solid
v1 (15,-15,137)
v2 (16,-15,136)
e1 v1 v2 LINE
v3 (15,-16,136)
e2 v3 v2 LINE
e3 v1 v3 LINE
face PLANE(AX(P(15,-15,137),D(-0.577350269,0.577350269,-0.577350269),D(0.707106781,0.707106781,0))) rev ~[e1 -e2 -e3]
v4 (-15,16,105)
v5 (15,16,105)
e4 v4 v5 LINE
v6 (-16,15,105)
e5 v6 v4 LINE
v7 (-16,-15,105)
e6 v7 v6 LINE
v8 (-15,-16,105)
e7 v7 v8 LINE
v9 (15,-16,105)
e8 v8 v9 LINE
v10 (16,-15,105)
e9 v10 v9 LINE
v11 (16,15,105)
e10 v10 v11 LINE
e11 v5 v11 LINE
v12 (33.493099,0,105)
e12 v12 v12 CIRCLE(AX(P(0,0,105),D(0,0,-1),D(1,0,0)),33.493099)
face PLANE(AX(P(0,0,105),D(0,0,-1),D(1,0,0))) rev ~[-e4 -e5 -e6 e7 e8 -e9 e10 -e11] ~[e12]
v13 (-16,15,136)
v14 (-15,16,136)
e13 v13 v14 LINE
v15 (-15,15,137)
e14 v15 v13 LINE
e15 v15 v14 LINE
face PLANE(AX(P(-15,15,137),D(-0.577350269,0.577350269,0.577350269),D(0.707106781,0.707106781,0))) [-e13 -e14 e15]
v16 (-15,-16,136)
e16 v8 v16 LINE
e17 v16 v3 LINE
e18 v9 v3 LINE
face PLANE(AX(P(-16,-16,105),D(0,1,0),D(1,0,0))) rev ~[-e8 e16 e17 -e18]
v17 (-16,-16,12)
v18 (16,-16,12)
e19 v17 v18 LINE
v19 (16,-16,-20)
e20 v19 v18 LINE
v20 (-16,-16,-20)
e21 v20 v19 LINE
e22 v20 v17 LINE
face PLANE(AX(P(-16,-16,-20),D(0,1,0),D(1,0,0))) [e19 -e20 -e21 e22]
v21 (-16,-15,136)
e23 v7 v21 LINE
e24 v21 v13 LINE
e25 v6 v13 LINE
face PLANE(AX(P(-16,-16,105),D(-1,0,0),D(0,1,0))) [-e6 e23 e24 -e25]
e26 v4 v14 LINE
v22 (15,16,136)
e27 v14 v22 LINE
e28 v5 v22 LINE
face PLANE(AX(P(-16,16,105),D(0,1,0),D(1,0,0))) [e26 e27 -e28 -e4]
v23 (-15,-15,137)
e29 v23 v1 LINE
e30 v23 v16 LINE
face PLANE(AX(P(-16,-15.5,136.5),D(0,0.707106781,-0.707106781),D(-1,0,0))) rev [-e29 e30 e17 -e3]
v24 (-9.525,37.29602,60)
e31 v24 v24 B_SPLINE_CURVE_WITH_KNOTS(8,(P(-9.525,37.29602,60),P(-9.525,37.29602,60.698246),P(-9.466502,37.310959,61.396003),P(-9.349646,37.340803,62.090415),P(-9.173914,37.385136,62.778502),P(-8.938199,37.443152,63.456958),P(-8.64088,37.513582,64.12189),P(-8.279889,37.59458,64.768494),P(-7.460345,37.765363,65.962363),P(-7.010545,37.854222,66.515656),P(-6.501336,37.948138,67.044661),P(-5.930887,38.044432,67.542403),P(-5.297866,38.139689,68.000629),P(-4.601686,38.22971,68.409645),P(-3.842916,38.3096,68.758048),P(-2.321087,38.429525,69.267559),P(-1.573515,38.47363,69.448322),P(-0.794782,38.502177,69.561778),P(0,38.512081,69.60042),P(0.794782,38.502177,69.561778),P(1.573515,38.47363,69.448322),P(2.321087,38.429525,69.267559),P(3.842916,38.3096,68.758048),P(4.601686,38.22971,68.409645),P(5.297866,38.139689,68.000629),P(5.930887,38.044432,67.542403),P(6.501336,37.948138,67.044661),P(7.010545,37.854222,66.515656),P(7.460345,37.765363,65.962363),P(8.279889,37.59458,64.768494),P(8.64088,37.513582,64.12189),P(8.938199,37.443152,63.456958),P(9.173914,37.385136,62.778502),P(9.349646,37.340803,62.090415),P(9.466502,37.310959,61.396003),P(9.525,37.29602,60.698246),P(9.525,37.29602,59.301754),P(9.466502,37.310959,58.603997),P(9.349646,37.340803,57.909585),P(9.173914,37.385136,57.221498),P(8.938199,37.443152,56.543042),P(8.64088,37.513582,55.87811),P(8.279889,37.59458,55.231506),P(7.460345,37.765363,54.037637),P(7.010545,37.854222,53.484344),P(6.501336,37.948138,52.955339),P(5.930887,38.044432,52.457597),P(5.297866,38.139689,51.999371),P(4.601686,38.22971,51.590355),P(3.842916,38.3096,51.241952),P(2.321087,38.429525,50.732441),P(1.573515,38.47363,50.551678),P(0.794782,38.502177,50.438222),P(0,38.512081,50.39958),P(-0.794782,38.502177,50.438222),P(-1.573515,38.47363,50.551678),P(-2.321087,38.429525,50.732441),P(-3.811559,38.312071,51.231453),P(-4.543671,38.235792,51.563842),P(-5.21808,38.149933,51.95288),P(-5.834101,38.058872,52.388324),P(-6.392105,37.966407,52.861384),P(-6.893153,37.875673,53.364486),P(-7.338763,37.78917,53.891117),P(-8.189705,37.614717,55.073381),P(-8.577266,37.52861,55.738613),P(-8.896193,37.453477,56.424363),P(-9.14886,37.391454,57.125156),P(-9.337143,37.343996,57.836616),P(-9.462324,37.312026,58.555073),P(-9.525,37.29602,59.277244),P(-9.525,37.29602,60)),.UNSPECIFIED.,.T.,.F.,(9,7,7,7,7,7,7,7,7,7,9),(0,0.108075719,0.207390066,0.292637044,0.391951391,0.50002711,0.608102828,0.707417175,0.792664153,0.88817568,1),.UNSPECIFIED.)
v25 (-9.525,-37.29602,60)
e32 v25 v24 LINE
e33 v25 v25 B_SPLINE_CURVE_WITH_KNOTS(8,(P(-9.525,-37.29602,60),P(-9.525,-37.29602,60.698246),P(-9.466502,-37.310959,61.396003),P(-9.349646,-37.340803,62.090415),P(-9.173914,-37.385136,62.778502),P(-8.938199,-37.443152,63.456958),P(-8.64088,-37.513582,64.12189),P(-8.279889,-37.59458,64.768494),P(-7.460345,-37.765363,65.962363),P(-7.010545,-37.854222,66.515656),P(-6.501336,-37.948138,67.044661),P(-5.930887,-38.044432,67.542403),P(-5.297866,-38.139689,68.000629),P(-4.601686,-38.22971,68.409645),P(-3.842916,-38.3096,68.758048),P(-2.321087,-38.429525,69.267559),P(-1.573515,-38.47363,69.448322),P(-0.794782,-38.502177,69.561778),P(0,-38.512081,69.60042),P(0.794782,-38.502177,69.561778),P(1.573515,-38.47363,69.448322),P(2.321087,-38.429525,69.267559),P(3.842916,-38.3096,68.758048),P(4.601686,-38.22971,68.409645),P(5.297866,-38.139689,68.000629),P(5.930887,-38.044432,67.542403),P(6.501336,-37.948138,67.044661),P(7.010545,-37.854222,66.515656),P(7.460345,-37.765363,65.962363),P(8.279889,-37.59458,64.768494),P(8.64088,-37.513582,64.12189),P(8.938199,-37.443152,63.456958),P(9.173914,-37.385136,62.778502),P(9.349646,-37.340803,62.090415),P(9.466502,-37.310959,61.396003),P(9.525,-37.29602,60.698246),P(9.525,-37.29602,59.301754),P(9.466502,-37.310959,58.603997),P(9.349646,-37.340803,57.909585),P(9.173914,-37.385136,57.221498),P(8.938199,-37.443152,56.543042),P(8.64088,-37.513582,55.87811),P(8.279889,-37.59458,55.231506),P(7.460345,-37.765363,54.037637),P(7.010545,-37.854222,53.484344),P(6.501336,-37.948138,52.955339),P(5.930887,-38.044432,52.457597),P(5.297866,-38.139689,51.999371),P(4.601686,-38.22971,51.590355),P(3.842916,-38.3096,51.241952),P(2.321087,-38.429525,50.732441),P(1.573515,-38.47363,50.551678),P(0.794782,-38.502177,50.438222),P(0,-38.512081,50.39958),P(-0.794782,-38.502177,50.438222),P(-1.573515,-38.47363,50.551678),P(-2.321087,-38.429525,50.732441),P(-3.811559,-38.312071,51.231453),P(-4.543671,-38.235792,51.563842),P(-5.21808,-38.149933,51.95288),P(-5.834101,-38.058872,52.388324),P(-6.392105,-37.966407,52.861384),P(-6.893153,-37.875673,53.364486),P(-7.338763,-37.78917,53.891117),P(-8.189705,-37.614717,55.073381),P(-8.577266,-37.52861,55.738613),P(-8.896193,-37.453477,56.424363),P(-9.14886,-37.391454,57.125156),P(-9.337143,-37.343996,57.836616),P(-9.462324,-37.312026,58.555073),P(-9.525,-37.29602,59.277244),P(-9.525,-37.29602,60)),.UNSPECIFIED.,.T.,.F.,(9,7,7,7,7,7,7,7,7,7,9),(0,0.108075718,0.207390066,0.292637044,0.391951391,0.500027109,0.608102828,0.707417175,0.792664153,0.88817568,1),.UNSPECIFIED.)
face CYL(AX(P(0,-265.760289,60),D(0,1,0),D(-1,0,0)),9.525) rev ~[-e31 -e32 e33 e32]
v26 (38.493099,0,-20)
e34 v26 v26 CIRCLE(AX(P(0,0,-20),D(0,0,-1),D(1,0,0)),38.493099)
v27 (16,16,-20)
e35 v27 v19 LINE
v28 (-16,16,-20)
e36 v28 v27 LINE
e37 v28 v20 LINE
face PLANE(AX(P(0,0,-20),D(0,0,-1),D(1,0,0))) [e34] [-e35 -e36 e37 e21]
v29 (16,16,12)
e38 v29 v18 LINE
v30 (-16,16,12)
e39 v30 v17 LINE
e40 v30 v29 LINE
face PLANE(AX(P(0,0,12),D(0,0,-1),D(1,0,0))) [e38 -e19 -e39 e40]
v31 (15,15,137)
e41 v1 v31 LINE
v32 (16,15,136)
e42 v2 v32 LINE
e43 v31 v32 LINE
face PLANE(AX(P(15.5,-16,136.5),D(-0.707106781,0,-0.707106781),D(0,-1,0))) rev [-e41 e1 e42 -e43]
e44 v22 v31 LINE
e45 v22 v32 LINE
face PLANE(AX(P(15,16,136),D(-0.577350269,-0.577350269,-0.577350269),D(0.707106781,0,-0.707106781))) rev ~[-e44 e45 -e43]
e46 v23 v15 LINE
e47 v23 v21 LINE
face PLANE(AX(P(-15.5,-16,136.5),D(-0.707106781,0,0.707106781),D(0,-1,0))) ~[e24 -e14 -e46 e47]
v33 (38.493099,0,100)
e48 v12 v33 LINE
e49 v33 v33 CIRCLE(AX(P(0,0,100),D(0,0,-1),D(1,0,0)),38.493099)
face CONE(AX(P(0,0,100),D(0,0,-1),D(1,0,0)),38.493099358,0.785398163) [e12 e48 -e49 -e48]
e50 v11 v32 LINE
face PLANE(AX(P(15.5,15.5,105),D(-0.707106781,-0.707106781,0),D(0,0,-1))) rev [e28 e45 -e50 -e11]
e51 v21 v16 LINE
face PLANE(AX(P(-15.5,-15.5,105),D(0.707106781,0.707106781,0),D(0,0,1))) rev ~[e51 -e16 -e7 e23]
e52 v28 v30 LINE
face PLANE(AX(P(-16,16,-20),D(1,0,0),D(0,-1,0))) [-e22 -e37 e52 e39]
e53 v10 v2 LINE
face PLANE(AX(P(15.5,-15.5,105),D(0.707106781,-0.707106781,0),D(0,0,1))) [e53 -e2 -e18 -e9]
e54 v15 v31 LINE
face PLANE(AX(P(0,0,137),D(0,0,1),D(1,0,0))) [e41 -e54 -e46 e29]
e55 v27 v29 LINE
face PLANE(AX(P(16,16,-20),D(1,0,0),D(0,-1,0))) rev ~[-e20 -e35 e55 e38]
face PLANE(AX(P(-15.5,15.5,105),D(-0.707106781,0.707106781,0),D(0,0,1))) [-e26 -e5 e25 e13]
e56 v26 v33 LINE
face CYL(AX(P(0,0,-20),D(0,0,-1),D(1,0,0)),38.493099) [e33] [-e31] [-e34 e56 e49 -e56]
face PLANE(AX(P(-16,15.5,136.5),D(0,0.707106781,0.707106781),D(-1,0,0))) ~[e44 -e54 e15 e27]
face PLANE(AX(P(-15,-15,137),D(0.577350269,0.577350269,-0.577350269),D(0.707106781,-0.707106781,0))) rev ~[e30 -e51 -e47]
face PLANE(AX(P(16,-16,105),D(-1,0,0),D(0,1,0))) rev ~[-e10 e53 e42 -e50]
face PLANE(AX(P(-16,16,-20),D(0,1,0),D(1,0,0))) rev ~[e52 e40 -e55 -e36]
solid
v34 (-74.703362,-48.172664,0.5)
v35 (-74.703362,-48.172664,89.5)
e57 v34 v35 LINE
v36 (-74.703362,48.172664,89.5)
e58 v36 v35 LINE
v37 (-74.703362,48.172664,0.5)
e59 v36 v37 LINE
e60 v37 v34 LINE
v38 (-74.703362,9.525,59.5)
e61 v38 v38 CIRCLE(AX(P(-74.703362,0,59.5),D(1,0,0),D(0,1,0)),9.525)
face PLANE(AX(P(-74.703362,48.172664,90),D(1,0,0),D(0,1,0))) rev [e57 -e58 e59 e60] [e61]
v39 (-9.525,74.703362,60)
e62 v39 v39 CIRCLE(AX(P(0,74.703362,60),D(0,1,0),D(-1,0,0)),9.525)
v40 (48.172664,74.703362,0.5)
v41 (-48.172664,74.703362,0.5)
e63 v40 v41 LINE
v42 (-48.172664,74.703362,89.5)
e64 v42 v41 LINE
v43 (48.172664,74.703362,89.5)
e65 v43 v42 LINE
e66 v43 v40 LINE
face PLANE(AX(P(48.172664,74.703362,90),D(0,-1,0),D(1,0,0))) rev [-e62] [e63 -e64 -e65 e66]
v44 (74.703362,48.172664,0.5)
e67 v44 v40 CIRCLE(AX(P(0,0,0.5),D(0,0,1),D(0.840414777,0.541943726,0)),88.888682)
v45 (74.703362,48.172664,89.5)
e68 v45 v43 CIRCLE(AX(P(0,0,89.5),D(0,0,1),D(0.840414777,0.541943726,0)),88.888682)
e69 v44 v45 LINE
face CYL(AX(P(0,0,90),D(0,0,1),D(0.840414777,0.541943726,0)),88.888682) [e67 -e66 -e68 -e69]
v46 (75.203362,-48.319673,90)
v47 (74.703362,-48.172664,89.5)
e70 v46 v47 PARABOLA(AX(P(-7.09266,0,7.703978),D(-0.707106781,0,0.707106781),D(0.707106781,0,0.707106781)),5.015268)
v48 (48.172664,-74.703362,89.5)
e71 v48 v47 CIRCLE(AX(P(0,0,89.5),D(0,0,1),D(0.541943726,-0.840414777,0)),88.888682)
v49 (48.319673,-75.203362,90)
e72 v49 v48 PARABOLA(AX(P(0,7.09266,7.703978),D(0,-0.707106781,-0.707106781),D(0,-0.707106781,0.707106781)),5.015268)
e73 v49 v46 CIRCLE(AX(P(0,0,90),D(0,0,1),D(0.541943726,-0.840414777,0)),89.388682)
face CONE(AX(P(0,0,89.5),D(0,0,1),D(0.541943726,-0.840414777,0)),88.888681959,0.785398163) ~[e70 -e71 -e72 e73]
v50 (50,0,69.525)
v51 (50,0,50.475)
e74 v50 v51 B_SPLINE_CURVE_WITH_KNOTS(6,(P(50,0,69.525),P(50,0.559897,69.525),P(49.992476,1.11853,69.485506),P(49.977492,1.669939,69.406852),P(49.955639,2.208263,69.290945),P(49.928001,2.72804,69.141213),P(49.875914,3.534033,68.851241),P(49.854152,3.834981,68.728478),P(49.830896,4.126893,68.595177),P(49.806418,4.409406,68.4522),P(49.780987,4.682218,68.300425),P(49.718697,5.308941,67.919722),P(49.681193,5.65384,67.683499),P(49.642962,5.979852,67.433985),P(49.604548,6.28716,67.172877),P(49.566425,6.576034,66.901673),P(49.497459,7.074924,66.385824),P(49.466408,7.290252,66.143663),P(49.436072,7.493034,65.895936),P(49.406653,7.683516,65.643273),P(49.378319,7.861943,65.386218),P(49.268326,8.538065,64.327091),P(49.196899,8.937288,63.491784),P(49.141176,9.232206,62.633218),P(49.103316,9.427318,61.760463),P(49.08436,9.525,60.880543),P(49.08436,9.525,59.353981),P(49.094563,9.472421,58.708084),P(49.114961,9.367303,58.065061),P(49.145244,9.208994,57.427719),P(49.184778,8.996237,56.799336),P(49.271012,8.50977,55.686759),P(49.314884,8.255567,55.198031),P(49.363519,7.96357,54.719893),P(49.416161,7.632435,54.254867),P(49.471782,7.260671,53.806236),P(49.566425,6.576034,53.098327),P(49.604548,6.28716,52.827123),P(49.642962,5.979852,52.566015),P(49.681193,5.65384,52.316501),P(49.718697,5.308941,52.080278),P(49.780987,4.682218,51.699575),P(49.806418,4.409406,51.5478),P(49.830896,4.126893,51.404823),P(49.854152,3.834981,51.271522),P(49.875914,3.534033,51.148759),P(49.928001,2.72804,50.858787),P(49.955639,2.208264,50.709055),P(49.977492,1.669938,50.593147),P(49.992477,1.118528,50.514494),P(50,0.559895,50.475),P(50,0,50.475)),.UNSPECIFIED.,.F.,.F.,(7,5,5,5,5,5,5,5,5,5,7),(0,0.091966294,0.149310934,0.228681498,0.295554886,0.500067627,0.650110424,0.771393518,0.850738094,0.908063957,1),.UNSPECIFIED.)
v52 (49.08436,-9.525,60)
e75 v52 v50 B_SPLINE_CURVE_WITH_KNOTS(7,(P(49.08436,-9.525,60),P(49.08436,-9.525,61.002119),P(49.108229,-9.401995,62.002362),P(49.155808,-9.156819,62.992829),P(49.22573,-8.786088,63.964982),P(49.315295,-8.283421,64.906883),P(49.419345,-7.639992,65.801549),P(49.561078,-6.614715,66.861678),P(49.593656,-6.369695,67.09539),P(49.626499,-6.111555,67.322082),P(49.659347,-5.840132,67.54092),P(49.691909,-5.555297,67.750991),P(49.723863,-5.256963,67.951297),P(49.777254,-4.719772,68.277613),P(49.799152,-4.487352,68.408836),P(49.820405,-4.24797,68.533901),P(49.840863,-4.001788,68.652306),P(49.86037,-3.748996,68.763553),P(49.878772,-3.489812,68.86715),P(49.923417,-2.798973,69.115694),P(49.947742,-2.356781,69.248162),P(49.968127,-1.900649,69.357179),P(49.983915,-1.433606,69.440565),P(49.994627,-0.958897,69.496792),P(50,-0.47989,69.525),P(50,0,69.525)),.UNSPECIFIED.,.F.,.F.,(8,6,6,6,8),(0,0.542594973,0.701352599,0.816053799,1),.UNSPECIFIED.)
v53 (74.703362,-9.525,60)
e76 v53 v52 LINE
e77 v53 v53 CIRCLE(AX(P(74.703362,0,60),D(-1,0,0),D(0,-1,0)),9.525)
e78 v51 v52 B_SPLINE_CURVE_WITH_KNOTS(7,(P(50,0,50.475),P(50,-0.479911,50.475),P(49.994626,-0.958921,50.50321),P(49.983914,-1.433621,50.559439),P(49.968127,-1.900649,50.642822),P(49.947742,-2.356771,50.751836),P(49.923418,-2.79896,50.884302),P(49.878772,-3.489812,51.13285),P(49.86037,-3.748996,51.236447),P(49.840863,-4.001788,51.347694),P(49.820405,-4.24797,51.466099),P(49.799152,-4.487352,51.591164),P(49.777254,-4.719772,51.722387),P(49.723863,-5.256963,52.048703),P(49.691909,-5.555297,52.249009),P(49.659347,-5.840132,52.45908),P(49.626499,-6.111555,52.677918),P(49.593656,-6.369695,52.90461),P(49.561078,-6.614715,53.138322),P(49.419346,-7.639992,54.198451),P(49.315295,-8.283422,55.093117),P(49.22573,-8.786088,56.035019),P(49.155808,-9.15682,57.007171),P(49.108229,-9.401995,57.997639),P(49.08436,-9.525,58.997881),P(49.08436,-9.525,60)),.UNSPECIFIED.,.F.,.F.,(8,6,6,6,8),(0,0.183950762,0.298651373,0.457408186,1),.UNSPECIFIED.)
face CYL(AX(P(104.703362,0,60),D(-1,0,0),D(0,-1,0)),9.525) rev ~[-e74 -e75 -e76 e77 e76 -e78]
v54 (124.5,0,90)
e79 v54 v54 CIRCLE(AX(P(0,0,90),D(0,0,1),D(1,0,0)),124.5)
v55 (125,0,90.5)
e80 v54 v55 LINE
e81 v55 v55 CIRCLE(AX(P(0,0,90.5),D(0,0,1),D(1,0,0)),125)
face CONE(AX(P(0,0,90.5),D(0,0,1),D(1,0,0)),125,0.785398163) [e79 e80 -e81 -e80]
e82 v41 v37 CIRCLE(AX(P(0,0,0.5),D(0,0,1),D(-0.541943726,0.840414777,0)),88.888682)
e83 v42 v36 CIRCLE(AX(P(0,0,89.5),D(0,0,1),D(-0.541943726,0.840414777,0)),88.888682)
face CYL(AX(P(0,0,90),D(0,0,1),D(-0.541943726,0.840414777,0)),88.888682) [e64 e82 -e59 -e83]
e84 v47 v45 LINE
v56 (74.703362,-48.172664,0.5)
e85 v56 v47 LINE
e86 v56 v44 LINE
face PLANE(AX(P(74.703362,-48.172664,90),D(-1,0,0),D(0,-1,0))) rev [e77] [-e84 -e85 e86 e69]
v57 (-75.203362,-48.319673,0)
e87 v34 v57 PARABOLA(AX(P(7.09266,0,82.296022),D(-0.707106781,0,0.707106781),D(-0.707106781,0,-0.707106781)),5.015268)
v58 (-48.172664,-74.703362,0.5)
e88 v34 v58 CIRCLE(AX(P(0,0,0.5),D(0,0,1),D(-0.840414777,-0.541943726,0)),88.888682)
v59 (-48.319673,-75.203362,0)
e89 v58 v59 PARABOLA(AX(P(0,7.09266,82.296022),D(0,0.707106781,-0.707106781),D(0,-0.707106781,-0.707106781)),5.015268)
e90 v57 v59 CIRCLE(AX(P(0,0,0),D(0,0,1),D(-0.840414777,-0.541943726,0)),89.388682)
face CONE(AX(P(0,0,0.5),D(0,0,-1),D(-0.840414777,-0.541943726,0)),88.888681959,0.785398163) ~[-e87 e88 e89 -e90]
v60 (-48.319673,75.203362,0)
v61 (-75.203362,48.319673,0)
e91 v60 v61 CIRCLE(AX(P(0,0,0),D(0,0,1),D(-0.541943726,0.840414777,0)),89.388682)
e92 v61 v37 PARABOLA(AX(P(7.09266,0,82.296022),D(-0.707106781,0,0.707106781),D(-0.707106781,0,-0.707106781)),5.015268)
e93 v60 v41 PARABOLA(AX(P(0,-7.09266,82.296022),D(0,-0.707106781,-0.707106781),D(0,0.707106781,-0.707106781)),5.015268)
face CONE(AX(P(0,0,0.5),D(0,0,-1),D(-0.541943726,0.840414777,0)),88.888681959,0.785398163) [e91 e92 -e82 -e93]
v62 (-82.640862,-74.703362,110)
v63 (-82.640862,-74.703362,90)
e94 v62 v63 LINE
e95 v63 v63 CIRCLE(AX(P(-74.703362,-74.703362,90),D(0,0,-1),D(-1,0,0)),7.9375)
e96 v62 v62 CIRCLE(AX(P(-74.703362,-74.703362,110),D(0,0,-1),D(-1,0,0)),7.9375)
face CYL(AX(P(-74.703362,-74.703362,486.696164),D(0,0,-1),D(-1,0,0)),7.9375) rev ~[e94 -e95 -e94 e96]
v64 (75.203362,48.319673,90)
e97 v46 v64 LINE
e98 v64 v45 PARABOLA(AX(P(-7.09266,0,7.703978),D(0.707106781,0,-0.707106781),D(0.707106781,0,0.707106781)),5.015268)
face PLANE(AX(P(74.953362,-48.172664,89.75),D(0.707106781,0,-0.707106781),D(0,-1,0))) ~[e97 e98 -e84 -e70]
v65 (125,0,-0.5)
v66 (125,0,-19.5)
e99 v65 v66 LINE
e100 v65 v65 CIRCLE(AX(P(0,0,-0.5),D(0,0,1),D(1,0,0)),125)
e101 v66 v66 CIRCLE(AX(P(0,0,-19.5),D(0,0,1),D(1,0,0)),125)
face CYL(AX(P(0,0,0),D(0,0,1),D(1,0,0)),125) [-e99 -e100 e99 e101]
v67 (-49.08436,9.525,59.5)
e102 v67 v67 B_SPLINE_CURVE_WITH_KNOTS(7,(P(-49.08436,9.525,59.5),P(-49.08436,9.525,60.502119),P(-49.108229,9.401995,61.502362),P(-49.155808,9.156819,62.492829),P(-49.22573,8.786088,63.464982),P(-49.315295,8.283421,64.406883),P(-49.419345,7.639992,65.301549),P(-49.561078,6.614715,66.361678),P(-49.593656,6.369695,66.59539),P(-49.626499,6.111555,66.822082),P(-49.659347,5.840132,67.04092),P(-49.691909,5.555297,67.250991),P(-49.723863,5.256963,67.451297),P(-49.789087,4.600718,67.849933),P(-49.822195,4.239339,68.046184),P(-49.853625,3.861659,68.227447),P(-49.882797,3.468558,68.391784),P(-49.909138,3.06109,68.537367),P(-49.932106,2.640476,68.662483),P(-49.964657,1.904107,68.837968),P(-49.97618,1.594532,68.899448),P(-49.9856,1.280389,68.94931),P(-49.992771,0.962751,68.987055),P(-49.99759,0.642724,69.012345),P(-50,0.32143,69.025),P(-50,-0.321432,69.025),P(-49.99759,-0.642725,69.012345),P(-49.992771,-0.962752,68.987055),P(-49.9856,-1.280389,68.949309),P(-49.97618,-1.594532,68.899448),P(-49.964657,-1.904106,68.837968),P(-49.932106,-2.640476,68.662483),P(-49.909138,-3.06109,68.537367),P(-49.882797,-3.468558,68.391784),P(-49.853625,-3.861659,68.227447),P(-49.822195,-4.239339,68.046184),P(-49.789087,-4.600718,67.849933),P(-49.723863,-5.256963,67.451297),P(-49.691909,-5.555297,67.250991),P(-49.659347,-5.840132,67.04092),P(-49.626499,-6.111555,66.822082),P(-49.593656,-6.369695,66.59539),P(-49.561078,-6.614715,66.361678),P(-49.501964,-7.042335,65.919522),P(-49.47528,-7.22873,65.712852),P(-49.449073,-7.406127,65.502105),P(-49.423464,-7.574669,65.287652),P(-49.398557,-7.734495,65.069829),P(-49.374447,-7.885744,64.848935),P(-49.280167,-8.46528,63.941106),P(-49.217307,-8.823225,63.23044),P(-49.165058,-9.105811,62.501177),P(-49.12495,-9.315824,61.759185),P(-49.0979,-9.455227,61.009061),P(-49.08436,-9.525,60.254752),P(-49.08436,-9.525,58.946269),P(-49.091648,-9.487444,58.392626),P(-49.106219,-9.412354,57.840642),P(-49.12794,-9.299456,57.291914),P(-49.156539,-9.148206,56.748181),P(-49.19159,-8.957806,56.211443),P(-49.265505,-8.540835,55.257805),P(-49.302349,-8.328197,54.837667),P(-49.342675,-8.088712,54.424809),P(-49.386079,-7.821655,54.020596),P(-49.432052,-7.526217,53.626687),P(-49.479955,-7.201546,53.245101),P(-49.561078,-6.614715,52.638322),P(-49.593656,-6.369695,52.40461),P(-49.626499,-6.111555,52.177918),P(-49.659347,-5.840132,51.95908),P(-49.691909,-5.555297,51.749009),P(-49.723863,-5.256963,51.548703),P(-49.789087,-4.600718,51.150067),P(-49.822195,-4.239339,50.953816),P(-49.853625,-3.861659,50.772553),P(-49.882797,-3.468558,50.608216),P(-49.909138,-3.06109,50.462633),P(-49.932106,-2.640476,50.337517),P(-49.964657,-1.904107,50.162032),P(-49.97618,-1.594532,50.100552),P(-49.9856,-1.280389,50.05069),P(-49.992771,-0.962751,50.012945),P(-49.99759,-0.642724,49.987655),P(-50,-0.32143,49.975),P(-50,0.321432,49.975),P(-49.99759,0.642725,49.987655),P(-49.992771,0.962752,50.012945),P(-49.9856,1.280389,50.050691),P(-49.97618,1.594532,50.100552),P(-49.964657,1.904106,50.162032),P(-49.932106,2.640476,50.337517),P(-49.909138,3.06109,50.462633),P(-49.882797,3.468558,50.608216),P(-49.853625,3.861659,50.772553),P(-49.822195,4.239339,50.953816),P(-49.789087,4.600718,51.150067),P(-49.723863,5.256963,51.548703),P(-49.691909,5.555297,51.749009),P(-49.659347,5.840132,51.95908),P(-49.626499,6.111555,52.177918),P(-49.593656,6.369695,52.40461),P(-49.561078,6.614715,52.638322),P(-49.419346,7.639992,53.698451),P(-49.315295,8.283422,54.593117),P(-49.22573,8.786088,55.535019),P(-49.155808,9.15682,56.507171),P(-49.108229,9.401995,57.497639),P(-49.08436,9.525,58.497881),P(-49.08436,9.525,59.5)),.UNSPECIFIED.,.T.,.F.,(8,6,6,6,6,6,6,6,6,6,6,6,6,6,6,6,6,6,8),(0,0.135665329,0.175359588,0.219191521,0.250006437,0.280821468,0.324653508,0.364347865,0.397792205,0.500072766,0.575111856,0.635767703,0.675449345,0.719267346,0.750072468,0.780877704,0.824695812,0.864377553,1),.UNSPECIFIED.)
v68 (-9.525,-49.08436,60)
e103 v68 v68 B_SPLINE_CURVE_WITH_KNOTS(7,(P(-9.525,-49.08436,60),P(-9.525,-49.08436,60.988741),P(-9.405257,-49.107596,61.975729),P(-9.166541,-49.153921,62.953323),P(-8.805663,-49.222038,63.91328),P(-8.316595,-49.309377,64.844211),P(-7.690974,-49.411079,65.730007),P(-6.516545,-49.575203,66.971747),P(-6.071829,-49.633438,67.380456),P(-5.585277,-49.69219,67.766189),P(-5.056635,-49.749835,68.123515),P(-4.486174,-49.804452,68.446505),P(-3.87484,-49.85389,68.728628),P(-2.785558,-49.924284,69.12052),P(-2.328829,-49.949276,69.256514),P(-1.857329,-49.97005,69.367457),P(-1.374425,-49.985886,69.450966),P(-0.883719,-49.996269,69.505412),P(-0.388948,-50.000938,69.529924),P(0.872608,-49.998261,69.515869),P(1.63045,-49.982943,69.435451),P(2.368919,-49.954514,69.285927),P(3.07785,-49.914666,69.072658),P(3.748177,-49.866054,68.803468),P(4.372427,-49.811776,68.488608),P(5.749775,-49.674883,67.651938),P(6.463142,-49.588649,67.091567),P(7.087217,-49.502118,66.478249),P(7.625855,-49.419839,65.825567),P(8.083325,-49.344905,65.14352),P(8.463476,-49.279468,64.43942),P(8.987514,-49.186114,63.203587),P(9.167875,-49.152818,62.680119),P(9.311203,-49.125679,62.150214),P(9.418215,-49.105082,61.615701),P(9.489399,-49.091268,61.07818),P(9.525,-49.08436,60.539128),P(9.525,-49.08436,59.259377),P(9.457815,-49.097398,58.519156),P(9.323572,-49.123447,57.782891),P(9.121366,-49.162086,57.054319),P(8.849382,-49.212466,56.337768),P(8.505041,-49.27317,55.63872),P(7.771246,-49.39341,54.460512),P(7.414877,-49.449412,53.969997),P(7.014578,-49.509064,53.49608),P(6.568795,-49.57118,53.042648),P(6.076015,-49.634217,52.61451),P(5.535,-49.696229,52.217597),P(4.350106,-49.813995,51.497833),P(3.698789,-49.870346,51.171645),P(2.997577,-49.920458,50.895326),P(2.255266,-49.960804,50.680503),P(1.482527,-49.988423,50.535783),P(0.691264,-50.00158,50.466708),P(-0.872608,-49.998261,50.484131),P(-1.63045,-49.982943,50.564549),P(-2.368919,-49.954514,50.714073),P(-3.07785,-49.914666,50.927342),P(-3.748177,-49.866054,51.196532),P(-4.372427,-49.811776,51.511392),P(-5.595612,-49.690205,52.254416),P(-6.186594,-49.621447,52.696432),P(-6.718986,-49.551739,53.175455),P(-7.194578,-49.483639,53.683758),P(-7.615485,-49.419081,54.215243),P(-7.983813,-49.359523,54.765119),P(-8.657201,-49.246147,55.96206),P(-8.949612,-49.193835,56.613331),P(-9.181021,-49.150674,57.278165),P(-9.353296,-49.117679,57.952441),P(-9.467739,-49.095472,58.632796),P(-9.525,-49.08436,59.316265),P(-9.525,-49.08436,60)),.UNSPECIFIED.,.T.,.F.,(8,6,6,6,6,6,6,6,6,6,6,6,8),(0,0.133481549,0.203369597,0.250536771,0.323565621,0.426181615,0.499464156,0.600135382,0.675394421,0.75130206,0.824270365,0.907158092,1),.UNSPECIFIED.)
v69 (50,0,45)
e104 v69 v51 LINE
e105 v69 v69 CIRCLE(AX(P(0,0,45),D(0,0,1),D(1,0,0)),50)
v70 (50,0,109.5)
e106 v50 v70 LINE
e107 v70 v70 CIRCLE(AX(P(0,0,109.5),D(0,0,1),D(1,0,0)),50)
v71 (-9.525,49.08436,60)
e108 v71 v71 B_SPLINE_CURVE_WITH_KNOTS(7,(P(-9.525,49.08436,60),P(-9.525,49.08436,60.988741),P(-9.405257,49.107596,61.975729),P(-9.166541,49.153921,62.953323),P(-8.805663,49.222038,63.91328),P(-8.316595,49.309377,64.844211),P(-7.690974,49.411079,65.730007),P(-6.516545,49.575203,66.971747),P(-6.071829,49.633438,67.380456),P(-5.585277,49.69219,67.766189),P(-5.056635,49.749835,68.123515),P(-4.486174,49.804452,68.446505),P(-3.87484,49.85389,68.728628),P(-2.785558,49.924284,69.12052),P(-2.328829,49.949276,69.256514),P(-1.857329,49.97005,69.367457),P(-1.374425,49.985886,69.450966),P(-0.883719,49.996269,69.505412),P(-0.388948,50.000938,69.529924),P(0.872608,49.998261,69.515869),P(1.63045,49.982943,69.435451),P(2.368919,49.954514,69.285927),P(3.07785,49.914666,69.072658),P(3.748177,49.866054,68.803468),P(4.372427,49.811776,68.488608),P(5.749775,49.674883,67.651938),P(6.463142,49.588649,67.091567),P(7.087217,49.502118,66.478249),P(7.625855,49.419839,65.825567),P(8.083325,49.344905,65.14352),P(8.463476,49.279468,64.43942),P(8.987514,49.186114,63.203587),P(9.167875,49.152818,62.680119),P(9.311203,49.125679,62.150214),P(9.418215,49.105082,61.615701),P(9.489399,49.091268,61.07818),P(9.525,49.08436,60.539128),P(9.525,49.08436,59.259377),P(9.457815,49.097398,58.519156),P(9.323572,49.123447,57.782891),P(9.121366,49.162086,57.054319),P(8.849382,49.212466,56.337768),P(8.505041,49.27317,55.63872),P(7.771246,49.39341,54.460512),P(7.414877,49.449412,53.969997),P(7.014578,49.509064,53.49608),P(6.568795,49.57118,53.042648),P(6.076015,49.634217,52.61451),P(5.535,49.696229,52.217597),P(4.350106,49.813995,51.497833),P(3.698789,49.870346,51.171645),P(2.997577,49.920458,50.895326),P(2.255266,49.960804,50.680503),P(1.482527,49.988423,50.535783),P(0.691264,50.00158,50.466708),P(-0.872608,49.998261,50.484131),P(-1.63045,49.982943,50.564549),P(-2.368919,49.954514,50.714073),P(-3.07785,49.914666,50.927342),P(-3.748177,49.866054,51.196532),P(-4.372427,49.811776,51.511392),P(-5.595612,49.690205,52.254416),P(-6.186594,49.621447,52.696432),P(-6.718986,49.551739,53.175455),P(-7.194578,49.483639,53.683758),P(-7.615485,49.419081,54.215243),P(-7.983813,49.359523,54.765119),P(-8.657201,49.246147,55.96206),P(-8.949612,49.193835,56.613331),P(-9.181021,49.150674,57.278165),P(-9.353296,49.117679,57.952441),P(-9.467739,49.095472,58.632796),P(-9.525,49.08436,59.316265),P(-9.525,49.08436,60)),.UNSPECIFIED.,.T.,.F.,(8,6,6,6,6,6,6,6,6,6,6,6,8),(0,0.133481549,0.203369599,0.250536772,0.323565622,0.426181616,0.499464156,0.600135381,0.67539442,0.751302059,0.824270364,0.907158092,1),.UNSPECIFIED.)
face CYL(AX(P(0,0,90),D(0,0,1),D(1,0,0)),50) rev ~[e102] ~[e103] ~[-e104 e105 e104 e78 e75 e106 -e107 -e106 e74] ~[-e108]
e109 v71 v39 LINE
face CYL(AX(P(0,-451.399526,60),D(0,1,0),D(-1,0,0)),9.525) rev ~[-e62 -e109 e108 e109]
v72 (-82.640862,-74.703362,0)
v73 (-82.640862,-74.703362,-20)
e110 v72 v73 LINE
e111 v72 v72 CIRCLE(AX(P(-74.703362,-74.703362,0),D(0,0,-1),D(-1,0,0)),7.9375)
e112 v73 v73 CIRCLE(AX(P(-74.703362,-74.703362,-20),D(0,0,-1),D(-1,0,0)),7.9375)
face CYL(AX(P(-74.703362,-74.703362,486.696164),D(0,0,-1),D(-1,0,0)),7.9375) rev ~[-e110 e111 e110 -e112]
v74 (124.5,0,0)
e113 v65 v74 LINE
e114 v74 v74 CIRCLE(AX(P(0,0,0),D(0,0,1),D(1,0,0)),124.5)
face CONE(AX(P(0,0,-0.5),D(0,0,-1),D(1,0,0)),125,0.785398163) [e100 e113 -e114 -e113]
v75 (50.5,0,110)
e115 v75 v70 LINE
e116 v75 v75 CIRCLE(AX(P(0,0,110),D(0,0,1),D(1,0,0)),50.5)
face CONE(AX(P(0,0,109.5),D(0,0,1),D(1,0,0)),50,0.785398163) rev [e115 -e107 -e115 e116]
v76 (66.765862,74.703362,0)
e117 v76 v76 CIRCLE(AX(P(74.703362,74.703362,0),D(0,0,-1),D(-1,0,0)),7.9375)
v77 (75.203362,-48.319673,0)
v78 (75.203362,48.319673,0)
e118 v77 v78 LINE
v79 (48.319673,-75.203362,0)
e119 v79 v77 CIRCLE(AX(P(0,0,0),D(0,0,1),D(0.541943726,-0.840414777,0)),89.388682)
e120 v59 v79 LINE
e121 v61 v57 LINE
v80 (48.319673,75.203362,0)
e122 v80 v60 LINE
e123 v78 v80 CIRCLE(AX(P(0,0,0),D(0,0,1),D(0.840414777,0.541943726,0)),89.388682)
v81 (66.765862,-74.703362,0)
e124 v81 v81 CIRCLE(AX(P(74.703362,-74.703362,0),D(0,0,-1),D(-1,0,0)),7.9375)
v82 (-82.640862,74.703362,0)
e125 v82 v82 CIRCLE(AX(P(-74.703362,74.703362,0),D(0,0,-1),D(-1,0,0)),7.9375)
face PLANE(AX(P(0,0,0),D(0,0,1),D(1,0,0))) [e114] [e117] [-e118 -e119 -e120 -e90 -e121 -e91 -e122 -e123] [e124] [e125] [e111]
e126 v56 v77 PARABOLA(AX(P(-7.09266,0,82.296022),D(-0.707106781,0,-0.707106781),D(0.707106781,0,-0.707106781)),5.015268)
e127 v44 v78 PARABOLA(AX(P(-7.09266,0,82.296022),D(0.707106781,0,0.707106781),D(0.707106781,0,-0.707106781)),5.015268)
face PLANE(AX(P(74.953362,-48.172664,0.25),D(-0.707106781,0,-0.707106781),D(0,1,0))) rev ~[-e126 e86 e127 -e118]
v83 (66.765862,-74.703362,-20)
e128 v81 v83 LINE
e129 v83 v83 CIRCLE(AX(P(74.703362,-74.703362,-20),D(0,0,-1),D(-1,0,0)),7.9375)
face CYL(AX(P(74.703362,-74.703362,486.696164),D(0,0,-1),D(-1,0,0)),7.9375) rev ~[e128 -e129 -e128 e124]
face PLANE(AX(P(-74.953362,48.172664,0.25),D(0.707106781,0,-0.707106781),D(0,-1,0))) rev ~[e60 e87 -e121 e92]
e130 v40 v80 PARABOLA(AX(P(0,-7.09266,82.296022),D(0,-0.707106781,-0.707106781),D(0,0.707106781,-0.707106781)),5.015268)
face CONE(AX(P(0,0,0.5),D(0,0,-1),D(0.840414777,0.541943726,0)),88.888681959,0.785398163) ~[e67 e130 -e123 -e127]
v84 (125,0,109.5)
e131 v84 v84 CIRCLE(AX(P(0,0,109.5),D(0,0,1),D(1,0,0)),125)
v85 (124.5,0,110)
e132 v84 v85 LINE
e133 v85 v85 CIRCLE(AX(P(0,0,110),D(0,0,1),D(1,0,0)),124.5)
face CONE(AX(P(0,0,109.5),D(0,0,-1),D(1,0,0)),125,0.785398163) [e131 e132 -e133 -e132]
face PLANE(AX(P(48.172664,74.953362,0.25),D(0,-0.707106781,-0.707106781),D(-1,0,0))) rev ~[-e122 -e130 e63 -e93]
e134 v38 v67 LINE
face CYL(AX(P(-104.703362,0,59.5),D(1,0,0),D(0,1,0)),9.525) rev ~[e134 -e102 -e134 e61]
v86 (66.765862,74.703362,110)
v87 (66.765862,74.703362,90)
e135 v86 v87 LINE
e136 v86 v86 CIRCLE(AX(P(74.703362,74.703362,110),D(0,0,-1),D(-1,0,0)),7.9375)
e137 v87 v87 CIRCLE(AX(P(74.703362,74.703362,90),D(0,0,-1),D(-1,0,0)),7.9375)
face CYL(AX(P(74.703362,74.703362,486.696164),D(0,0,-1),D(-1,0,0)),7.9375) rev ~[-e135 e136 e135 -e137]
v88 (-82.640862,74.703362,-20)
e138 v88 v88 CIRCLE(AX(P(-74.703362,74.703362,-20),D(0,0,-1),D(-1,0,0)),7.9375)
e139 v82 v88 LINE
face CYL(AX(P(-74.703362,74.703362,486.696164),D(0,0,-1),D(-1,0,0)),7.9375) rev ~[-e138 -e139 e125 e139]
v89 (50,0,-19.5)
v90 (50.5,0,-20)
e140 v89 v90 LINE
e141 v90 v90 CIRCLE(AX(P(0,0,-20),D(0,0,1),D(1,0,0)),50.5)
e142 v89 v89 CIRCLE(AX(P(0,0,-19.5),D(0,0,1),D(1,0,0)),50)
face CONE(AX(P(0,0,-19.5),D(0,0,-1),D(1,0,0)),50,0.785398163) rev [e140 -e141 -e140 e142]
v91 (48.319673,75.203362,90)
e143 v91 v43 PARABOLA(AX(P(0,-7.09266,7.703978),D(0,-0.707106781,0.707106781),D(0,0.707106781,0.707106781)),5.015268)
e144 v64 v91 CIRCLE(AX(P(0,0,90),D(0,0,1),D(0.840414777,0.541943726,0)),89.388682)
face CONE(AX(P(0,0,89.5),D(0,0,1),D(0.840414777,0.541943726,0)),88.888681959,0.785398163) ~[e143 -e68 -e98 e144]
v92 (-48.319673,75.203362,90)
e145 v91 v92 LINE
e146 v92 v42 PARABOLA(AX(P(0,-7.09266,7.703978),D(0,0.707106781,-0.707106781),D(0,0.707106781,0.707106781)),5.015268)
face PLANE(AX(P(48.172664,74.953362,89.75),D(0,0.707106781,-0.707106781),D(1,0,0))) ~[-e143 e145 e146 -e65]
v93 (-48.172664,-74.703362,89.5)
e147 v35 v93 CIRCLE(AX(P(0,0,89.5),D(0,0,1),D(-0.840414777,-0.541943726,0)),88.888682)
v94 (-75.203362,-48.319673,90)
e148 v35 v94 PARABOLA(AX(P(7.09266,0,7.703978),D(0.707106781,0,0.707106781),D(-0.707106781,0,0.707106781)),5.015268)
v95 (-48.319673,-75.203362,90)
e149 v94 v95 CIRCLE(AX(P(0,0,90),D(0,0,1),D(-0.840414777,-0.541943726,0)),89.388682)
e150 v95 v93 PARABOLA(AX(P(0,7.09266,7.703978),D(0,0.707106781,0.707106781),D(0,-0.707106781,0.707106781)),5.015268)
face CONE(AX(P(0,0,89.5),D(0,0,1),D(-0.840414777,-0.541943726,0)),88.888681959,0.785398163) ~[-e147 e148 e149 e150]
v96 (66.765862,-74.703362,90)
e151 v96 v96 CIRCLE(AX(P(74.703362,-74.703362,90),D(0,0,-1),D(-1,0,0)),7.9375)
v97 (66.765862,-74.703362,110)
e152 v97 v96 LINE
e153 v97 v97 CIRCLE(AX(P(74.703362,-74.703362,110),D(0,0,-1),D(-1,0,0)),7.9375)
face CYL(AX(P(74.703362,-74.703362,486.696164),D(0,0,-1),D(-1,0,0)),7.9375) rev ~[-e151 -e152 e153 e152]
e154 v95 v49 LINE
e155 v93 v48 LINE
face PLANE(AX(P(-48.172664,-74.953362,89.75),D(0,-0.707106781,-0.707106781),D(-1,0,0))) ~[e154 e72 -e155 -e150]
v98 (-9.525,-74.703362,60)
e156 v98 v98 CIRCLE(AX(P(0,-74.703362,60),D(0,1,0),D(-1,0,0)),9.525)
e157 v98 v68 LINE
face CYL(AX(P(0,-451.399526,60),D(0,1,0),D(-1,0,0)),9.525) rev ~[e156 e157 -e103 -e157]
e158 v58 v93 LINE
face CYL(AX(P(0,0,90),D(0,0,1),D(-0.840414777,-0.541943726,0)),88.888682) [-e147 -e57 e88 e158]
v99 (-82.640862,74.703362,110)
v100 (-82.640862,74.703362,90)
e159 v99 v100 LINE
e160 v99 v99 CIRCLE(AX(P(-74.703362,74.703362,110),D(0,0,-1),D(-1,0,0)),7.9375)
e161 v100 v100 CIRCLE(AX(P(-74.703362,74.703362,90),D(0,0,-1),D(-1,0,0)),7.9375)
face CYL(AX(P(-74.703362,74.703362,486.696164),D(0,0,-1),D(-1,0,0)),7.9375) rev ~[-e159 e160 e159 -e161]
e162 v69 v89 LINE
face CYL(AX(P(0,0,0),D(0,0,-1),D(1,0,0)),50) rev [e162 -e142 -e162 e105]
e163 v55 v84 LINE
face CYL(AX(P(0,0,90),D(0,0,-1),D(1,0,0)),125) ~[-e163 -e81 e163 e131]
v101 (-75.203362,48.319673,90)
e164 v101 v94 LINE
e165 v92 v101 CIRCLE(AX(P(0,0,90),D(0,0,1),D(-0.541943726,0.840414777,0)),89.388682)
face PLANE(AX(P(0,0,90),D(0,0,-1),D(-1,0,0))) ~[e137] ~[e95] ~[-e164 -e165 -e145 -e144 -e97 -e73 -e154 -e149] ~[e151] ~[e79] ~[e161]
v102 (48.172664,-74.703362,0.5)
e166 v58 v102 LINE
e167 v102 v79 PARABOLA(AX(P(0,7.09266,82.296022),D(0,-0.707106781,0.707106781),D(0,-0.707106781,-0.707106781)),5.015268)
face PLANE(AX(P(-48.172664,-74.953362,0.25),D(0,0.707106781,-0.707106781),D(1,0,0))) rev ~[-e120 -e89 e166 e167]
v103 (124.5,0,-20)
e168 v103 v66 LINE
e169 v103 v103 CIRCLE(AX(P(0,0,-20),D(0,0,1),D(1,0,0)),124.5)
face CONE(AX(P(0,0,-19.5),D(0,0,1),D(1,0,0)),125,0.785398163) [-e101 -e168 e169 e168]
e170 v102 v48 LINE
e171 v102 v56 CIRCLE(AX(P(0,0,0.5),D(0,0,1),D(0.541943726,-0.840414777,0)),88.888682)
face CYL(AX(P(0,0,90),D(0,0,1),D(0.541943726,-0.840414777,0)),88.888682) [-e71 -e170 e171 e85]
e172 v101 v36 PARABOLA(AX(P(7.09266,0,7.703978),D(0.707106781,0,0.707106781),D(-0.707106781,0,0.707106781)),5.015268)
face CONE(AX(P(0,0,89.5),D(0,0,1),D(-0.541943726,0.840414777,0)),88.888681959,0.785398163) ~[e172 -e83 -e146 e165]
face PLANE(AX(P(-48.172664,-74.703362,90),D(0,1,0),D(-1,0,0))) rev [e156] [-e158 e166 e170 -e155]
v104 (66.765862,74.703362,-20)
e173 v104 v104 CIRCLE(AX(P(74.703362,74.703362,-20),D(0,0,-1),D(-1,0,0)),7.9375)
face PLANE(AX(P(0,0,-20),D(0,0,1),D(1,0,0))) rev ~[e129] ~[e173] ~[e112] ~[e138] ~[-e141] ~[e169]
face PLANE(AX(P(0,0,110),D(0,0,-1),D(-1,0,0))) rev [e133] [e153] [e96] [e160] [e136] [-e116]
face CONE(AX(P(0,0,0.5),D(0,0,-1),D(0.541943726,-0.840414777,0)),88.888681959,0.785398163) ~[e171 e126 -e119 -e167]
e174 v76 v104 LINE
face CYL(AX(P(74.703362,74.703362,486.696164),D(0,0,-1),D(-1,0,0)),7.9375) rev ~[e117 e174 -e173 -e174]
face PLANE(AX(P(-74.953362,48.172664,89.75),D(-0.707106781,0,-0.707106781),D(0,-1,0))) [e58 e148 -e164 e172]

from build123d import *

# Parameters (mm, degrees)
F0_R      = 125
F0_R_2    = 50
F1_DEPTH  = 20
F2_DEPTH  = 45
F7_R      = 38.4930993585
F8_DEPTH  = 125
F9_W      = 32
F9_H      = 32
F10_DEPTH = 32
F11_W     = 32
F11_H     = 32
F12_DEPTH = 32
F13_SIZE  = 1
F14_SIZE  = 0.5
F15_D     = 15.875
F16_D     = 19.05
F16_2_D   = 19.05
F17_D     = 19.05
F17_DEPTH = 30
F17_TIP   = 5.7231973962
F19_D     = 19.05
F19_DEPTH = 30
F19_TIP   = 5.7231973962
F20_SIZE  = 5


# Not quite as in the source:
# - a length typed as a fraction of an inch, garbled in the dataset ("3 / 203.2 mm" for 3/8 in), is restored


with BuildPart() as f1:
    # F0 (on Top) → F1 (new body)
    with BuildSketch(Plane.XY):
        Circle(F0_R)
        with BuildLine():
            Line((-48.1726635133, -74.7033618391), (-74.7033618391, -74.7033618391))
            Line((-74.7033618391, -74.7033618391), (-74.7033618391, -48.1726635133))
            ThreePointArc((-74.7033618391, -48.1726635133), (-88.8886819568, 0), (-74.7033618391, 48.1726635133))
            Line((-74.7033618391, 48.1726635133), (-74.7033618391, 74.7033618391))
            Line((-74.7033618391, 74.7033618391), (-48.1726635133, 74.7033618391))
            ThreePointArc((-48.1726635133, 74.7033618391), (0, 88.8886819568), (48.1726635133, 74.7033618391))
            Line((48.1726635133, 74.7033618391), (74.7033618391, 74.7033618391))
            Line((74.7033618391, 74.7033618391), (74.7033618391, 48.1726635133))
            ThreePointArc((74.7033618391, 48.1726635133), (85.2686377036, 25.1089068699), (88.8886819568, 0))
            ThreePointArc((88.8886819568, 0), (85.2686377036, -25.1089068699), (74.7033618391, -48.1726635133))
            Line((74.7033618391, -48.1726635133), (74.7033618391, -74.7033618391))
            Line((74.7033618391, -74.7033618391), (48.1726635133, -74.7033618391))
            ThreePointArc((48.1726635133, -74.7033618391), (0, -88.8886819568), (-48.1726635133, -74.7033618391))
        make_face(mode=Mode.SUBTRACT)
        with BuildLine():
            Line((-74.7033618391, 48.1726635133), (-74.7033618391, -48.1726635133))
            ThreePointArc((-74.7033618391, -48.1726635133), (-62.8537897824, -62.8537897824), (-48.1726635133, -74.7033618391))
            Line((-48.1726635133, -74.7033618391), (48.1726635133, -74.7033618391))
            ThreePointArc((48.1726635133, -74.7033618391), (62.8537897824, -62.8537897824), (74.7033618391, -48.1726635133))
            Line((74.7033618391, -48.1726635133), (74.7033618391, 48.1726635133))
            ThreePointArc((74.7033618391, 48.1726635133), (62.8537897824, 62.8537897824), (48.1726635133, 74.7033618391))
            Line((48.1726635133, 74.7033618391), (-48.1726635133, 74.7033618391))
            ThreePointArc((-48.1726635133, 74.7033618391), (-62.8537897824, 62.8537897824), (-74.7033618391, 48.1726635133))
        make_face()
        Circle(F0_R_2, mode=Mode.SUBTRACT)
        with BuildLine():
            Line((48.1726635133, -74.7033618391), (-48.1726635133, -74.7033618391))
            ThreePointArc((-48.1726635133, -74.7033618391), (0, -88.8886819568), (48.1726635133, -74.7033618391))
        make_face()
        with BuildLine():
            ThreePointArc((-74.7033618391, 48.1726635133), (-88.8886819568, 0), (-74.7033618391, -48.1726635133))
            Line((-74.7033618391, -48.1726635133), (-74.7033618391, 48.1726635133))
        make_face()
        with BuildLine():
            ThreePointArc((48.1726635133, 74.7033618391), (0, 88.8886819568), (-48.1726635133, 74.7033618391))
            Line((-48.1726635133, 74.7033618391), (48.1726635133, 74.7033618391))
        make_face()
        with BuildLine():
            Line((74.7033618391, 48.1726635133), (74.7033618391, -48.1726635133))
            ThreePointArc((74.7033618391, -48.1726635133), (85.2686377036, -25.1089068699), (88.8886819568, 0))
            ThreePointArc((88.8886819568, 0), (85.2686377036, 25.1089068699), (74.7033618391, 48.1726635133))
        make_face()
        with BuildLine():
            Line((-74.7033618391, 74.7033618391), (-74.7033618391, 48.1726635133))
            ThreePointArc((-74.7033618391, 48.1726635133), (-62.8537897824, 62.8537897824), (-48.1726635133, 74.7033618391))
            Line((-48.1726635133, 74.7033618391), (-74.7033618391, 74.7033618391))
        make_face()
        with BuildLine():
            Line((-74.7033618391, -48.1726635133), (-74.7033618391, -74.7033618391))
            Line((-74.7033618391, -74.7033618391), (-48.1726635133, -74.7033618391))
            ThreePointArc((-48.1726635133, -74.7033618391), (-62.8537897824, -62.8537897824), (-74.7033618391, -48.1726635133))
        make_face()
        with BuildLine():
            ThreePointArc((74.7033618391, -48.1726635133), (62.8537897824, -62.8537897824), (48.1726635133, -74.7033618391))
            Line((48.1726635133, -74.7033618391), (74.7033618391, -74.7033618391))
            Line((74.7033618391, -74.7033618391), (74.7033618391, -48.1726635133))
        make_face()
        with BuildLine():
            Line((74.7033618391, 74.7033618391), (48.1726635133, 74.7033618391))
            ThreePointArc((48.1726635133, 74.7033618391), (62.8537897824, 62.8537897824), (74.7033618391, 48.1726635133))
            Line((74.7033618391, 48.1726635133), (74.7033618391, 74.7033618391))
        make_face()
    extrude(amount=-F1_DEPTH)

    # F0 (on Top) → F2 (join)
    with BuildSketch(Plane.XY):
        with BuildLine():
            Line((-74.7033618391, 48.1726635133), (-74.7033618391, -48.1726635133))
            ThreePointArc((-74.7033618391, -48.1726635133), (-62.8537897824, -62.8537897824), (-48.1726635133, -74.7033618391))
            Line((-48.1726635133, -74.7033618391), (48.1726635133, -74.7033618391))
            ThreePointArc((48.1726635133, -74.7033618391), (62.8537897824, -62.8537897824), (74.7033618391, -48.1726635133))
            Line((74.7033618391, -48.1726635133), (74.7033618391, 48.1726635133))
            ThreePointArc((74.7033618391, 48.1726635133), (62.8537897824, 62.8537897824), (48.1726635133, 74.7033618391))
            Line((48.1726635133, 74.7033618391), (-48.1726635133, 74.7033618391))
            ThreePointArc((-48.1726635133, 74.7033618391), (-62.8537897824, 62.8537897824), (-74.7033618391, 48.1726635133))
        make_face()
        Circle(F0_R_2, mode=Mode.SUBTRACT)
    extrude(amount=F2_DEPTH)

    # F3: F1 across face


with BuildPart() as f1_1:
    add(f1.part)
    add(f1.part.mirror(Plane.XY.offset(45)))

    # F14
    f14_edges = [f1_1.edges().sort_by_distance(p)[0] for p in [
        (-125, 0, 110),
        (-50, 0, 110),
        (-125, 0, 90),
        (-62.85379, 62.85379, 90),
        (-74.703362, 0, 90),
        (-62.85379, -62.85379, 90),
        (0, -74.703362, 90),
        (62.85379, -62.85379, 90),
        (74.703362, 0, 90),
        (62.85379, 62.85379, 90),
        (0, 74.703362, 90),
        (-125, 0, -20),
        (-50, 0, -20),
        (-125, 0, 0),
        (-62.85379, 62.85379, 0),
        (-74.703362, 0, 0),
        (-62.85379, -62.85379, 0),
        (0, -74.703362, 0),
        (62.85379, -62.85379, 0),
        (74.703362, 0, 0),
        (62.85379, 62.85379, 0),
        (0, 74.703362, 0),
    ]]
    chamfer(f14_edges, length=F14_SIZE)

    # F15 (through all)
    with Locations(Plane.XY.offset(110)):
        with Locations((74.7033618391, -74.7033618391), (74.7033618391, 74.7033618391), (-74.7033618391, 74.7033618391), (-74.7033618391, -74.7033618391)):
            Hole(F15_D / 2)

    # F16 (through all)
    with Locations(Plane.XZ.offset(74.7033618391)):
        with Locations((0, 60)):
            Hole(F16_D / 2)

    # F17
    with Locations(Plane.YZ.offset(74.7033618391)):
        with Locations((0, 60)):
            Hole(F17_D / 2, depth=F17_DEPTH)
            with Locations((0, 0, -(F17_DEPTH + F17_TIP / 2))):  # 118° drill point
                Cone(0, F17_D / 2, F17_TIP, mode=Mode.SUBTRACT)

    # F19
    with Locations(Plane(origin=(-74.7033618391, 0, 0), x_dir=(0, -1, 0), z_dir=(-1, 0, 0))):
        with Locations((0, 59.5)):
            Hole(F19_D / 2, depth=F19_DEPTH)
            with Locations((0, 0, -(F19_DEPTH + F19_TIP / 2))):  # 118° drill point
                Cone(0, F19_D / 2, F19_TIP, mode=Mode.SUBTRACT)


with BuildPart() as f8:
    # F7 (on face) → F8 (new body)
    with BuildSketch(Plane(origin=(0, 0, -20), x_dir=(1, 0, 0), z_dir=(0, 0, -1))):
        Circle(F7_R)
    extrude(amount=-F8_DEPTH)

    # F9 (on face) → F10 (join)
    with BuildSketch(Plane.XY.offset(105)):
        Rectangle(F9_W, F9_H)
    extrude(amount=F10_DEPTH)

    # F11 (on face) → F12 (cut)
    with BuildSketch(Plane(origin=(0, 0, -20), x_dir=(1, 0, 0), z_dir=(0, 0, -1))):
        Rectangle(F11_W, F11_H)
    extrude(amount=-F12_DEPTH, mode=Mode.SUBTRACT)

    # F13
    f13_edges = [f8.edges().sort_by_distance(p)[0] for p in [
        (-16, 16, 121),
        (-16, -16, 121),
        (16, -16, 121),
        (-16, 0, 137),
        (0, -16, 137),
        (16, 0, 137),
        (0, 16, 137),
        (16, 16, 121),
    ]]
    chamfer(f13_edges, length=F13_SIZE)

    # F16#2 (through all)
    with Locations(Plane.XZ.offset(74.7033618391)):
        with Locations((0, 60)):
            Hole(F16_2_D / 2)

    # F20
    f20_edges = [f8.edges().sort_by_distance(p)[0] for p in [
        (-38.493099, 0, 105),
    ]]
    chamfer(f20_edges, length=F20_SIZE)


solid = Compound([f1_1.part, f8.part])
